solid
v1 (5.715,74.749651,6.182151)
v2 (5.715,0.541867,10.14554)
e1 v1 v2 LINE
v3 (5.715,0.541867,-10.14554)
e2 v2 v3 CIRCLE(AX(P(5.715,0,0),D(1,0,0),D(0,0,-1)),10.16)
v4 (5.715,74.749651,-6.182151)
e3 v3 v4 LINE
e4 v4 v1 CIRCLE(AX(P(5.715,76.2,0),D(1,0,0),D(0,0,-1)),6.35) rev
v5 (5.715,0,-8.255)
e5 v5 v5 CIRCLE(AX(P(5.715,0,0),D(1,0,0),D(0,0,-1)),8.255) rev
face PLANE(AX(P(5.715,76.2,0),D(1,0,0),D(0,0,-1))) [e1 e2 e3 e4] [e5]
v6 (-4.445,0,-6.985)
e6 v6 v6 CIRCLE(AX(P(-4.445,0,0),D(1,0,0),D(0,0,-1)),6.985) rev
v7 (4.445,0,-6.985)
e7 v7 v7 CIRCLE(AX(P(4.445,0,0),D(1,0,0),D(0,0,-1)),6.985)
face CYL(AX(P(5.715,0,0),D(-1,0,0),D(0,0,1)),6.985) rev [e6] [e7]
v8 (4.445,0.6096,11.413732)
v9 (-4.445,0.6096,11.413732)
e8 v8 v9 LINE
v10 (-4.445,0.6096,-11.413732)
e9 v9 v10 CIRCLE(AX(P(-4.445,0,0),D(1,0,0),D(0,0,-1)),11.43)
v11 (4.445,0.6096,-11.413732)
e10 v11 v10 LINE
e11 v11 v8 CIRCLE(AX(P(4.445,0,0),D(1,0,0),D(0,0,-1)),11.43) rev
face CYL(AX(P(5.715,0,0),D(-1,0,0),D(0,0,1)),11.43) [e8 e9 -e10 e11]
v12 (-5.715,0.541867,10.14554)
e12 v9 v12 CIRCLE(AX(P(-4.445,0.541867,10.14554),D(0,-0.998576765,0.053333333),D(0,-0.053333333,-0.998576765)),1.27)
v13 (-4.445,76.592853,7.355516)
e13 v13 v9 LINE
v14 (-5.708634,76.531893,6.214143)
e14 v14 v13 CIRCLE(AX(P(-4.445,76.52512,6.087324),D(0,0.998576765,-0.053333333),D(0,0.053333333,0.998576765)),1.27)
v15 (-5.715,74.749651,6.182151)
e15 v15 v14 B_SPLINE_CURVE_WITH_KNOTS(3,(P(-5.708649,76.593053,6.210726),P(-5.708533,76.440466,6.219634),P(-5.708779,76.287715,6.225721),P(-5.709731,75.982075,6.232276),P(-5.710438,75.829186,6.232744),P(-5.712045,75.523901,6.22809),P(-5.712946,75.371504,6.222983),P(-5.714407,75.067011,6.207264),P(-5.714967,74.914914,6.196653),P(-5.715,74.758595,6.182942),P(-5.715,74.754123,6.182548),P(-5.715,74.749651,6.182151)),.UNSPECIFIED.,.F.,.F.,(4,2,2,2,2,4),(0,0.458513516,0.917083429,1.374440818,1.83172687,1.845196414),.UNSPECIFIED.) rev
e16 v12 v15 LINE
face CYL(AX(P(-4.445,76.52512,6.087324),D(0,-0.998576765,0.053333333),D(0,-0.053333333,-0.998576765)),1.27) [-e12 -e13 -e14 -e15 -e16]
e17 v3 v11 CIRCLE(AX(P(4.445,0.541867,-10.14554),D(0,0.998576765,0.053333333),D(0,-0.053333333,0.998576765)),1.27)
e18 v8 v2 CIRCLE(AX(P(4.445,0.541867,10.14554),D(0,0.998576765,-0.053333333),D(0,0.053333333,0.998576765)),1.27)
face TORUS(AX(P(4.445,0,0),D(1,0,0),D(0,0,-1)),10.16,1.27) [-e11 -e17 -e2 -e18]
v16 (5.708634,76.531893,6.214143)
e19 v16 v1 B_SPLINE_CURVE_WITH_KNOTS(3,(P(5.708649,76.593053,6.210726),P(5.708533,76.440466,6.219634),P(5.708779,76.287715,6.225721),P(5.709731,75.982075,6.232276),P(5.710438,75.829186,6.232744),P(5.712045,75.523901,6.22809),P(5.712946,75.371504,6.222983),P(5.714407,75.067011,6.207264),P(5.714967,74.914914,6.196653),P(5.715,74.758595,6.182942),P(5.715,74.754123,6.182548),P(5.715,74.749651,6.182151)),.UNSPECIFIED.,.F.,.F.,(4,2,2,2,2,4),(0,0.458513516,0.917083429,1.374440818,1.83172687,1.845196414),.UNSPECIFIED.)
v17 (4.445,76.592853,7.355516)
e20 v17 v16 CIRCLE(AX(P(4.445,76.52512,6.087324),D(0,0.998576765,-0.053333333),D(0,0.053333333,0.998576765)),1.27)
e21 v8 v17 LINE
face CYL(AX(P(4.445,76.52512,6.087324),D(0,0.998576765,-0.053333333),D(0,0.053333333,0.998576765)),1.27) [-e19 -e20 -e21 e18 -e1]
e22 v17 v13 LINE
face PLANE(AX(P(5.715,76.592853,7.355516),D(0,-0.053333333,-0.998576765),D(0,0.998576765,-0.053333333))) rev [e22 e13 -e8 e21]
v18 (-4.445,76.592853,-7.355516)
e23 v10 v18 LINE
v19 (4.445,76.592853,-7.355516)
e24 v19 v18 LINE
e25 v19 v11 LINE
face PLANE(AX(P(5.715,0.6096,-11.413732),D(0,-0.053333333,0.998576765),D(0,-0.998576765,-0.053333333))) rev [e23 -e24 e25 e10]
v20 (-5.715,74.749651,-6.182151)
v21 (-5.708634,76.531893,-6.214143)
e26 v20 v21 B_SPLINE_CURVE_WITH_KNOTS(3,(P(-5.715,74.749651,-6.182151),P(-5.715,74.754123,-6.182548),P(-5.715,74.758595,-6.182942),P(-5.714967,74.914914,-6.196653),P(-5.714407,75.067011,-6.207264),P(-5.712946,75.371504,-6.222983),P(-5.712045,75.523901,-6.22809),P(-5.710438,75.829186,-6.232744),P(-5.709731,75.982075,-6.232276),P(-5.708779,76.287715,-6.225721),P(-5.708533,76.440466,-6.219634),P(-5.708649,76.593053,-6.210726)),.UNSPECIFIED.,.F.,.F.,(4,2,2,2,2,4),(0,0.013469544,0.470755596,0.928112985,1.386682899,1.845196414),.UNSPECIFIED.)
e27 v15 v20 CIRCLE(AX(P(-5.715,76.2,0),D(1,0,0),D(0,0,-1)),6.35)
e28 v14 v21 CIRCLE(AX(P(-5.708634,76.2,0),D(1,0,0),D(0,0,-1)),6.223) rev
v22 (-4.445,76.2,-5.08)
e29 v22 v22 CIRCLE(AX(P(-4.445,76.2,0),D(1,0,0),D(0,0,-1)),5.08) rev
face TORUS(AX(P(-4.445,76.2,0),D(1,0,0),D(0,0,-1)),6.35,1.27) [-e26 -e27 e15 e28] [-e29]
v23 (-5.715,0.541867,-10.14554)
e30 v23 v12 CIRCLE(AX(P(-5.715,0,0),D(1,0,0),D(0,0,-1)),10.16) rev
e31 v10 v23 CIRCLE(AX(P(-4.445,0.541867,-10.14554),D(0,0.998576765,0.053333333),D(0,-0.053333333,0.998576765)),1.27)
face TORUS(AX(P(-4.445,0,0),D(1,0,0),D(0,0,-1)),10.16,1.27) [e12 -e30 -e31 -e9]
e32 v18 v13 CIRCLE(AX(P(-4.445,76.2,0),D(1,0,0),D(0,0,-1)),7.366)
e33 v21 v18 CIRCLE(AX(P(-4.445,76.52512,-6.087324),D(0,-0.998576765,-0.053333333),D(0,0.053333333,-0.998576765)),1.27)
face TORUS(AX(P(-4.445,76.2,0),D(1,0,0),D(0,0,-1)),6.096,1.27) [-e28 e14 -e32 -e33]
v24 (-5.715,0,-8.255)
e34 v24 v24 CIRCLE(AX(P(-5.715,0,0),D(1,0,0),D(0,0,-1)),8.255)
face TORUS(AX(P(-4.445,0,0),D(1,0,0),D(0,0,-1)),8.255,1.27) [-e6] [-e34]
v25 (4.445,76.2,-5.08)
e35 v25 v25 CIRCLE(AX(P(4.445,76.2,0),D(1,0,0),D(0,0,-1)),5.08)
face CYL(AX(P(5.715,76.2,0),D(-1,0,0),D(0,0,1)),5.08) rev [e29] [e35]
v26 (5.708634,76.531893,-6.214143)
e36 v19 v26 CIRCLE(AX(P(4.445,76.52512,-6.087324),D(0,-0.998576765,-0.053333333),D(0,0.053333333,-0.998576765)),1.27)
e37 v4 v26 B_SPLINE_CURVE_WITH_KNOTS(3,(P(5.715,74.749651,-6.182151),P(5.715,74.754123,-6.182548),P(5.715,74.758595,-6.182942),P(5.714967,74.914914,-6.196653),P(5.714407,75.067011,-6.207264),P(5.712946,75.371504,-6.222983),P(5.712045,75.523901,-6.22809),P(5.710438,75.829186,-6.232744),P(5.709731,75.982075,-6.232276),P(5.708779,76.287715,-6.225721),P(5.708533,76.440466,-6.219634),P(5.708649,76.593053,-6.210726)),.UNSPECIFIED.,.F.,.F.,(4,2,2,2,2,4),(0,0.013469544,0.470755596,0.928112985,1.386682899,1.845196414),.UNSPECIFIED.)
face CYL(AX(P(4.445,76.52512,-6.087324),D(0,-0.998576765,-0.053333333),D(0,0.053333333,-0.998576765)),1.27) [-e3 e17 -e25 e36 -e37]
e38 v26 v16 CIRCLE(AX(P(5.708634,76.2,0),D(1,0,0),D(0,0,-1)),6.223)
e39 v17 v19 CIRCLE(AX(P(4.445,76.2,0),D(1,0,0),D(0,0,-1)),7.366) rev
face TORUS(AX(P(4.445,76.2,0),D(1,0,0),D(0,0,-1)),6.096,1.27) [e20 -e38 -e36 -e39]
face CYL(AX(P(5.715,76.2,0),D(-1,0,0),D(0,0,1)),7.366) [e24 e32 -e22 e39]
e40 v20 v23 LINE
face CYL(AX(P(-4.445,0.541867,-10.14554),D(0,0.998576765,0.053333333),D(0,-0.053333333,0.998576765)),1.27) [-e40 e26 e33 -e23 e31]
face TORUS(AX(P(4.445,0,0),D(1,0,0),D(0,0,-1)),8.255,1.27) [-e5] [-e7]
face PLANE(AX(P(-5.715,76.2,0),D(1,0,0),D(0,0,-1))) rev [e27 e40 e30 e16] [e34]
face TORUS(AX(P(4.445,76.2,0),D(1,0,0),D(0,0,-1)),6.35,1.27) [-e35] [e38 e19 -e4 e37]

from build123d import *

# Parameters (mm, degrees)
SKETCH1_R           = 6.985
SKETCH1_R_2         = 5.08
BOSS_EXTRUDE1_DEPTH = 5.715
FILLET1_R           = 1.27


with BuildPart() as part:
    # Sketch1 → Boss-Extrude1 (new, symmetric)
    with BuildSketch(Plane(origin=(0, 0, 0), x_dir=(0, 0, -1), z_dir=(1, 0, 0))):
        with BuildLine():
            Line((-7.355516451, 76.592853333), (-11.413732424, 0.6096))
            ThreePointArc((-11.413732424, 0.6096), (0, -11.43), (11.413732424, 0.6096))
            Line((11.413732424, 0.6096), (7.355516451, 76.592853333))
            ThreePointArc((7.355516451, 76.592853333), (0, 83.566), (-7.355516451, 76.592853333))
        make_face()
        Circle(SKETCH1_R, mode=Mode.SUBTRACT)
        with Locations((0, 76.2)):
            Circle(SKETCH1_R_2, mode=Mode.SUBTRACT)
    extrude(amount=BOSS_EXTRUDE1_DEPTH, both=True)

    # Fillet1
    # the kernel refuses this fillet: 1.27 mm, written as the material it takes off along each edge
    with BuildSketch(Plane(origin=(-5.715, 0, 0), x_dir=(0, 0, -1), z_dir=(0, -1, 0))) as fillet1_piece_1:
        with BuildLine():
            CenterArc((6.985 + FILLET1_R, FILLET1_R), FILLET1_R, 180, 90)
            Line((6.985 + FILLET1_R, 0), (6.985, 0))
            Line((6.985, 0), (6.985, FILLET1_R))
        make_face()
    revolve(axis=Axis((-5.715, 0, 0), (1, 0, 0)), mode=Mode.SUBTRACT)
    with BuildSketch(Plane(origin=(5.715, 0, 0), x_dir=(0, 0, -1), z_dir=(0, -1, 0))) as fillet1_piece_2:
        with BuildLine():
            CenterArc((6.985 + FILLET1_R, -FILLET1_R), FILLET1_R, 90, 90)
            Line((6.985, -FILLET1_R), (6.985, 0))
            Line((6.985, 0), (6.985 + FILLET1_R, 0))
        make_face()
    revolve(axis=Axis((5.715, 0, 0), (1, 0, 0)), mode=Mode.SUBTRACT)
    with BuildSketch(Plane(origin=(5.715, 0, 0), x_dir=(0, 0.05333333333333351, 0.9985767649788149), z_dir=(0, 0.9985767649788149, -0.05333333333333351))) as fillet1_piece_3:
        with BuildLine():
            CenterArc((11.43 - FILLET1_R, -FILLET1_R), FILLET1_R, 0, 90)
            Line((11.43 - FILLET1_R, 0), (11.43, 0))
            Line((11.43, 0), (11.43, -FILLET1_R))
        make_face()
    revolve(axis=Axis((5.715, 0, 0), (1, 0, 0)), revolution_arc=186.114450857, mode=Mode.SUBTRACT)
    with BuildSketch(Plane(origin=(-5.715, 76.2, 0), x_dir=(0, 0, -1), z_dir=(0, -1, 0))) as fillet1_piece_4:
        with BuildLine():
            CenterArc((5.08 + FILLET1_R, FILLET1_R), FILLET1_R, 180, 90)
            Line((5.08 + FILLET1_R, 0), (5.08, 0))
            Line((5.08, 0), (5.08, FILLET1_R))
        make_face()
    revolve(axis=Axis((-5.715, 76.2, 0), (1, 0, 0)), mode=Mode.SUBTRACT)
    with BuildSketch(Plane(origin=(5.715, 76.2, 0), x_dir=(0, 0, -1), z_dir=(0, -1, 0))) as fillet1_piece_5:
        with BuildLine():
            CenterArc((5.08 + FILLET1_R, -FILLET1_R), FILLET1_R, 90, 90)
            Line((5.08, -FILLET1_R), (5.08, 0))
            Line((5.08, 0), (5.08 + FILLET1_R, 0))
        make_face()
    revolve(axis=Axis((5.715, 76.2, 0), (1, 0, 0)), mode=Mode.SUBTRACT)
    with BuildSketch(Plane(origin=(5.715, 0.6096, -11.413732424), x_dir=(-1, 0, 0), z_dir=(0, 0.9985767649788151, 0.05333333333333325)), Plane(origin=(5.715, 76.592853333, 7.355516451), x_dir=(-1, 0, 0), z_dir=(0, -0.9985767649788151, 0.053333333333333316))) as fillet1_piece_6:
        with BuildLine():
            CenterArc((FILLET1_R, FILLET1_R), FILLET1_R, 180, 90)
            Line((0, FILLET1_R), (0, 0))
            Line((0, 0), (FILLET1_R, 0))
        make_face()
    extrude(amount=76.091549491, mode=Mode.SUBTRACT)
    with BuildSketch(Plane(origin=(5.715, 76.2, 0), x_dir=(0, 0.05333333333333354, -0.9985767649788151), z_dir=(0, -0.9985767649788151, -0.05333333333333354))) as fillet1_piece_7:
        with BuildLine():
            CenterArc((7.366 - FILLET1_R, -FILLET1_R), FILLET1_R, 0, 90)
            Line((7.366, -FILLET1_R), (7.366, 0))
            Line((7.366, 0), (7.366 - FILLET1_R, 0))
        make_face()
    revolve(axis=Axis((5.715, 76.2, 0), (1, 0, 0)), revolution_arc=173.885549143, mode=Mode.SUBTRACT)
    with BuildSketch(Plane(origin=(-5.715, 0.6096, -11.413732424), x_dir=(1, 0, 0), z_dir=(0, 0.9985767649788151, 0.05333333333333325)), Plane(origin=(-5.715, 76.592853333, 7.355516451), x_dir=(1, 0, 0), z_dir=(0, -0.9985767649788151, 0.053333333333333316))) as fillet1_piece_8:
        with BuildLine():
            CenterArc((FILLET1_R, -FILLET1_R), FILLET1_R, 90, 90)
            Line((0, -FILLET1_R), (0, 0))
            Line((0, 0), (FILLET1_R, 0))
        make_face()
    extrude(amount=76.091549491, mode=Mode.SUBTRACT)
    with BuildSketch(Plane(origin=(-5.715, 0, 0), x_dir=(0, 0.05333333333333351, 0.9985767649788149), z_dir=(0, 0.9985767649788149, -0.05333333333333351))) as fillet1_piece_9:
        with BuildLine():
            CenterArc((11.43 - FILLET1_R, FILLET1_R), FILLET1_R, 270, 90)
            Line((11.43 - FILLET1_R, 0), (11.43, 0))
            Line((11.43, 0), (11.43, FILLET1_R))
        make_face()
    revolve(axis=Axis((-5.715, 0, 0), (1, 0, 0)), revolution_arc=186.114450857, mode=Mode.SUBTRACT)
    with BuildSketch(Plane(origin=(-5.715, 76.2, 0), x_dir=(0, 0.05333333333333354, -0.9985767649788151), z_dir=(0, -0.9985767649788151, -0.05333333333333354))) as fillet1_piece_10:
        with BuildLine():
            CenterArc((7.366 - FILLET1_R, FILLET1_R), FILLET1_R, 270, 90)
            Line((7.366 - FILLET1_R, 0), (7.366, 0))
            Line((7.366, 0), (7.366, FILLET1_R))
        make_face()
    revolve(axis=Axis((-5.715, 76.2, 0), (1, 0, 0)), revolution_arc=173.885549143, mode=Mode.SUBTRACT)


solid = part.part
